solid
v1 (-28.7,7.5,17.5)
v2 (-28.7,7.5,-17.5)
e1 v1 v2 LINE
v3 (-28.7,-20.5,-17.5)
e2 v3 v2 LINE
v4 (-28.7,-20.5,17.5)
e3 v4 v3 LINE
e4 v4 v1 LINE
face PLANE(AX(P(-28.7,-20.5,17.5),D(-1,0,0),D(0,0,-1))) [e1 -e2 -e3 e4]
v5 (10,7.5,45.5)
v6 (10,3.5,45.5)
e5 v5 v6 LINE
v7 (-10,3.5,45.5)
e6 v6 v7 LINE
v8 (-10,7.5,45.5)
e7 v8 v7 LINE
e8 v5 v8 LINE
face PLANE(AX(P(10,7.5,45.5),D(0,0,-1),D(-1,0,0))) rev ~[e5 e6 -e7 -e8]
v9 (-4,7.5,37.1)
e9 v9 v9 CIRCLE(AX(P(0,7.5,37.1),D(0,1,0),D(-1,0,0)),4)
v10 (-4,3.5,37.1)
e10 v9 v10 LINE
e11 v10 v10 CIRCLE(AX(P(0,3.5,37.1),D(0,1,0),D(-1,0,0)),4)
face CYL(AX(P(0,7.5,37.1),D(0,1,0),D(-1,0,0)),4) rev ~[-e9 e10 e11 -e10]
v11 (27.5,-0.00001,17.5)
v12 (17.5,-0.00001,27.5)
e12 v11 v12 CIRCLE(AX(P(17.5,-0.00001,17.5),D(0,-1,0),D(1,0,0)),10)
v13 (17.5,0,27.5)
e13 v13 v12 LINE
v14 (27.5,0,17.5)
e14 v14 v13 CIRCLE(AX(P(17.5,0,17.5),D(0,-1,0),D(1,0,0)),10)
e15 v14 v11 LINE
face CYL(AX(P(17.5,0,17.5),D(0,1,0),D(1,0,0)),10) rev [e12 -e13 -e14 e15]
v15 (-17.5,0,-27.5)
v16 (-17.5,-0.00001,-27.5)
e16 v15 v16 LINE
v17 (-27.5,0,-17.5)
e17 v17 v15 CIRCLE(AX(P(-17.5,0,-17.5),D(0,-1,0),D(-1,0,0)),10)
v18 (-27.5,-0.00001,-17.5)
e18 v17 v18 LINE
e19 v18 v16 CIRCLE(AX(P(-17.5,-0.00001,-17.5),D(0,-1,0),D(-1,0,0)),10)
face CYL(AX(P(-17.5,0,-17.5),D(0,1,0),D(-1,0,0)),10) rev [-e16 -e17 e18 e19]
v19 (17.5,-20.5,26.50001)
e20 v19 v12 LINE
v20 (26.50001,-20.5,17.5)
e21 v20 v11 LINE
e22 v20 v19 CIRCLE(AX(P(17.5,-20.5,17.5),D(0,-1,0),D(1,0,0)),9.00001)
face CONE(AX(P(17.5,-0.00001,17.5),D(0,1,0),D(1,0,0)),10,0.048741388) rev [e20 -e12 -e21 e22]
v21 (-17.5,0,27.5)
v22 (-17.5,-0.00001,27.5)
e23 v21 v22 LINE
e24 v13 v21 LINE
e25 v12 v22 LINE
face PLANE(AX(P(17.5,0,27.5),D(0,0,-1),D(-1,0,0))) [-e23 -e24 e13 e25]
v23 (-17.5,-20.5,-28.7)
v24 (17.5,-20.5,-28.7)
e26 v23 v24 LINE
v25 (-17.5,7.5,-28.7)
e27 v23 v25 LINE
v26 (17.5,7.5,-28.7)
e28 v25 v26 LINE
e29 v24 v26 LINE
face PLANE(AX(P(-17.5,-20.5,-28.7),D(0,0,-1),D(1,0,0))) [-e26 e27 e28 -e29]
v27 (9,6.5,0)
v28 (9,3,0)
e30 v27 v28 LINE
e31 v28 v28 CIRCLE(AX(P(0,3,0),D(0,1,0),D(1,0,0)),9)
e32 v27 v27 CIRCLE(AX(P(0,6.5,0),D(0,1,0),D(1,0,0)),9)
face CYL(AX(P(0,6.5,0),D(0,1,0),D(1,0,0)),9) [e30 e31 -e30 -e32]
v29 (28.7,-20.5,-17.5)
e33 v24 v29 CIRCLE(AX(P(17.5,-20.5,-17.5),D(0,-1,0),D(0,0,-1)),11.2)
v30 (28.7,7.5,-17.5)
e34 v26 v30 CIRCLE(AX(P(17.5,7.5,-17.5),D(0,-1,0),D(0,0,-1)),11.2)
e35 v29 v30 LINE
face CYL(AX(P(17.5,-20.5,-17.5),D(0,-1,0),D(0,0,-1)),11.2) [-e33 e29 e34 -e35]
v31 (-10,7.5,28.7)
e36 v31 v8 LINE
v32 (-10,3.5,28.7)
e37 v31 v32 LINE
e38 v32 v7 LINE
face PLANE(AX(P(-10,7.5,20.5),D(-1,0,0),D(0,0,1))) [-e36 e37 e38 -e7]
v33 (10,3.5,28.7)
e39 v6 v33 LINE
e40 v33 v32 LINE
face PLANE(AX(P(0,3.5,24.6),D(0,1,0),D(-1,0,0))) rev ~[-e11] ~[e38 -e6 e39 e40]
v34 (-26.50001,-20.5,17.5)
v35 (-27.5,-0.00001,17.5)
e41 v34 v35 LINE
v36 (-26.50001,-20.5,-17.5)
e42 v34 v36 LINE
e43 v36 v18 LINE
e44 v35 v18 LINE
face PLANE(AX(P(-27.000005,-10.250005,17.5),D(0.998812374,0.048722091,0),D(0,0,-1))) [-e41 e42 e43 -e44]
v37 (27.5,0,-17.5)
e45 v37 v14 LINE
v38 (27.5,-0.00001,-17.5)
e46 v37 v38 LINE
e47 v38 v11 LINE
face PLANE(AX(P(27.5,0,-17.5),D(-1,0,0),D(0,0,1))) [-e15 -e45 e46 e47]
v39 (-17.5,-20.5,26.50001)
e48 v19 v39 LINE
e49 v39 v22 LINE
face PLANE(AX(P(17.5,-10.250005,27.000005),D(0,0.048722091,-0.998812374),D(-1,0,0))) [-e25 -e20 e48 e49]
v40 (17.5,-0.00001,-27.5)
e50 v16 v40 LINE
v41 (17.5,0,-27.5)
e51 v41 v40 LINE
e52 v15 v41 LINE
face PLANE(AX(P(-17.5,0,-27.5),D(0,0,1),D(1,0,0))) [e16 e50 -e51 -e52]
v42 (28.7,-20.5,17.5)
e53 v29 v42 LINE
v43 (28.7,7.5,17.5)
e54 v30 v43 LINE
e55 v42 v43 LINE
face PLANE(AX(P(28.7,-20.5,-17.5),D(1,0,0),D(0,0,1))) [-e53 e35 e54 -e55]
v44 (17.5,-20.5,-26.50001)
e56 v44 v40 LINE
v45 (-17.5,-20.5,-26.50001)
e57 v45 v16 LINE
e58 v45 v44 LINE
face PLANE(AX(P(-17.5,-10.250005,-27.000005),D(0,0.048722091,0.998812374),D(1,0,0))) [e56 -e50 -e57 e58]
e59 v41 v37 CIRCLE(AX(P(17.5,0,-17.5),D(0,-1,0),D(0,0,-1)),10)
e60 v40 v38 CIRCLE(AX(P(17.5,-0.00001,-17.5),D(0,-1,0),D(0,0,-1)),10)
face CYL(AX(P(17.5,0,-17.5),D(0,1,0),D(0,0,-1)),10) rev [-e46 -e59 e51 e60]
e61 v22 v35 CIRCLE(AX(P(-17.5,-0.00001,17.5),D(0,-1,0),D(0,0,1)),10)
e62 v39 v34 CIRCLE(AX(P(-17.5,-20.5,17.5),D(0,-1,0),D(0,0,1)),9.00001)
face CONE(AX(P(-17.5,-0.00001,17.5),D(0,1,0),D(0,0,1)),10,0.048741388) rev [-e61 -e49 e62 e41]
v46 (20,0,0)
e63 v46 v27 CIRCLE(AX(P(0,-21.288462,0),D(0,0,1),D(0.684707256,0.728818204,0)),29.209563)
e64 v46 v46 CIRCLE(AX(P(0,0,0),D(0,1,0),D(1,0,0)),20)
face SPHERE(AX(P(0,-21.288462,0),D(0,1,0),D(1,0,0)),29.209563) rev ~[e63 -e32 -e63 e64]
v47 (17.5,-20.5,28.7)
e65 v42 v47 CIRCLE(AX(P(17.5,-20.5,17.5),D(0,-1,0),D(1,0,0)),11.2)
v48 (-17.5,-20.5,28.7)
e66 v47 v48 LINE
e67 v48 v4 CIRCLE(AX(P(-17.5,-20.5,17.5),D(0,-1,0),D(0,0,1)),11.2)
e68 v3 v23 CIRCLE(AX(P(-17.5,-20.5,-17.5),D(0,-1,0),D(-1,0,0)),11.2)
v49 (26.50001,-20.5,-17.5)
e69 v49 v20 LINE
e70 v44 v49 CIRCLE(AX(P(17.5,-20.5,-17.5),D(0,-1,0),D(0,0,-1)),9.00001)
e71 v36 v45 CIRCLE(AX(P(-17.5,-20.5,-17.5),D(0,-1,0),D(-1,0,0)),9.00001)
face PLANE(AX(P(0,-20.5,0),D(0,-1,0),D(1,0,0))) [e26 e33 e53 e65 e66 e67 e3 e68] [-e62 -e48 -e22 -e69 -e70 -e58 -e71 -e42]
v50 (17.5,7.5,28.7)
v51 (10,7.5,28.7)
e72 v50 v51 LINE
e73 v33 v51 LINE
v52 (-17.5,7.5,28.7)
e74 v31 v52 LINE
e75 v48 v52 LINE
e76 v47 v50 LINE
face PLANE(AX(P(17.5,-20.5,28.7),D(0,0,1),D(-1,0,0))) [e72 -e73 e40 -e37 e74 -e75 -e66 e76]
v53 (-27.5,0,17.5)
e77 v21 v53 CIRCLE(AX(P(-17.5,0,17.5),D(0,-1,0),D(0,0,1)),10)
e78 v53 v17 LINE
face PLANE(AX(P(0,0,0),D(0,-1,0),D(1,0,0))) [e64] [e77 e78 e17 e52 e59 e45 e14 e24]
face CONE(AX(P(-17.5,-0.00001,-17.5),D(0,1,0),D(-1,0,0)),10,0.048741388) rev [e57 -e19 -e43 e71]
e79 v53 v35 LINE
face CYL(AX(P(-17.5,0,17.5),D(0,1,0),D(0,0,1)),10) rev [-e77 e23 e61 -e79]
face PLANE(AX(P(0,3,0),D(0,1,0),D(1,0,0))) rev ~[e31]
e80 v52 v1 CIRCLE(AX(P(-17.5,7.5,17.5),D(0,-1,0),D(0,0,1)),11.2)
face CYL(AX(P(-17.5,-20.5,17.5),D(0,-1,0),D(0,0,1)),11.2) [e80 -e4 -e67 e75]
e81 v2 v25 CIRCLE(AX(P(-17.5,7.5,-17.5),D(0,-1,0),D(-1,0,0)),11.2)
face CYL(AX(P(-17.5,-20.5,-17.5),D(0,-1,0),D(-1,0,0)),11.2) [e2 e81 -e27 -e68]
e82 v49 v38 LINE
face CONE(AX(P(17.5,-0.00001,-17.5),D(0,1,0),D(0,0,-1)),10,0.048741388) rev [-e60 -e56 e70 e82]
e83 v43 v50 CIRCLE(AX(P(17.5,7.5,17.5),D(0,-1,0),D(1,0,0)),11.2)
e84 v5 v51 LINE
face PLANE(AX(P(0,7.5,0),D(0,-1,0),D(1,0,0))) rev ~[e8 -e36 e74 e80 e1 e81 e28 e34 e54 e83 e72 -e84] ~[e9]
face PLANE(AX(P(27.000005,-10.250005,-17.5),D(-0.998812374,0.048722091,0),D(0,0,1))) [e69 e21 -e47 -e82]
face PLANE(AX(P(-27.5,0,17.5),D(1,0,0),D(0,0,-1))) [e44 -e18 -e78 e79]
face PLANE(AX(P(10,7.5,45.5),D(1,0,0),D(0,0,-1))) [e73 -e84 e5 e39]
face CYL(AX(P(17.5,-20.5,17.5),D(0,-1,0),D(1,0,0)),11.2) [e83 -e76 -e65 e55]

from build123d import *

# Parameters (mm, degrees)
F0_R      = 20
F0_R_2    = 9
F2_DEPTH  = 20.5
F3_SIZE2  = 20.49999
F3_SIZE   = 0.99999
F5_DEPTH  = 3.5
F7_DEPTH  = 28
F9_W      = 20
F9_H      = 8.2
F9_H_2    = 16.8
F9_R      = 4
F10_DEPTH = 4


# Not quite as in the source:
# - a fillet or chamfer is up to 0.001 mm smaller than in the source, because OpenCascade refuses the exact size
# - a feature names something its author has since deleted; it is built from what else it names


with BuildPart() as f2:
    # F0 (on Front) → F2 (new body)
    with BuildSketch(Plane.XZ):
        with BuildLine():
            Line((-17.5, -27.5), (17.5, -27.5))
            ThreePointArc((17.5, -27.5), (24.5710678119, -24.5710678119), (27.5, -17.5))
            Line((27.5, -17.5), (27.5, 17.5))
            ThreePointArc((27.5, 17.5), (24.5710678119, 24.5710678119), (17.5, 27.5))
            Line((17.5, 27.5), (-17.5, 27.5))
            ThreePointArc((-17.5, 27.5), (-24.5710678119, 24.5710678119), (-27.5, 17.5))
            Line((-27.5, 17.5), (-27.5, -17.5))
            ThreePointArc((-27.5, -17.5), (-24.5710678119, -24.5710678119), (-17.5, -27.5))
        make_face()
        with BuildLine():
            ThreePointArc((17.5, 26.5), (23.8639610307, 23.8639610307), (26.5, 17.5))
            Line((26.5, 17.5), (26.5, -17.5))
            ThreePointArc((26.5, -17.5), (23.8639610307, -23.8639610307), (17.5, -26.5))
            Line((17.5, -26.5), (-17.5, -26.5))
            ThreePointArc((-17.5, -26.5), (-23.8639610307, -23.8639610307), (-26.5, -17.5))
            Line((-26.5, -17.5), (-26.5, 17.5))
            ThreePointArc((-26.5, 17.5), (-23.8639610307, 23.8639610307), (-17.5, 26.5))
            Line((-17.5, 26.5), (17.5, 26.5))
        make_face(mode=Mode.SUBTRACT)
        with BuildLine():
            Line((26.5, -17.5), (26.5, 17.5))
            ThreePointArc((26.5, 17.5), (23.8639610307, 23.8639610307), (17.5, 26.5))
            Line((17.5, 26.5), (-17.5, 26.5))
            ThreePointArc((-17.5, 26.5), (-23.8639610307, 23.8639610307), (-26.5, 17.5))
            Line((-26.5, 17.5), (-26.5, -17.5))
            ThreePointArc((-26.5, -17.5), (-23.8639610307, -23.8639610307), (-17.5, -26.5))
            Line((-17.5, -26.5), (17.5, -26.5))
            ThreePointArc((17.5, -26.5), (23.8639610307, -23.8639610307), (26.5, -17.5))
        make_face()
        with BuildLine():
            ThreePointArc((17.5, 25.5), (23.1568542495, 23.1568542495), (25.5, 17.5))
            Line((25.5, 17.5), (25.5, -17.5))
            ThreePointArc((25.5, -17.5), (23.1568542495, -23.1568542495), (17.5, -25.5))
            Line((17.5, -25.5), (-17.5, -25.5))
            ThreePointArc((-17.5, -25.5), (-23.1568542495, -23.1568542495), (-25.5, -17.5))
            Line((-25.5, -17.5), (-25.5, 17.5))
            ThreePointArc((-25.5, 17.5), (-23.1568542495, 23.1568542495), (-17.5, 25.5))
            Line((-17.5, 25.5), (17.5, 25.5))
        make_face(mode=Mode.SUBTRACT)
        with BuildLine():
            Line((25.5, -17.5), (25.5, 17.5))
            ThreePointArc((25.5, 17.5), (23.1568542495, 23.1568542495), (17.5, 25.5))
            Line((17.5, 25.5), (-17.5, 25.5))
            ThreePointArc((-17.5, 25.5), (-23.1568542495, 23.1568542495), (-25.5, 17.5))
            Line((-25.5, 17.5), (-25.5, -17.5))
            ThreePointArc((-25.5, -17.5), (-23.1568542495, -23.1568542495), (-17.5, -25.5))
            Line((-17.5, -25.5), (17.5, -25.5))
            ThreePointArc((17.5, -25.5), (23.1568542495, -23.1568542495), (25.5, -17.5))
        make_face()
        Circle(F0_R, mode=Mode.SUBTRACT)
        Circle(F0_R)
        Circle(F0_R_2, mode=Mode.SUBTRACT)
        Circle(F0_R_2)
    extrude(amount=F2_DEPTH)

    # F3 (size 1 and 20.5 in the source; OpenCascade refuses exactly that, so slightly less here)
    f3_edges = [f2.edges().sort_by_distance(p)[0] for p in [
        (0, -20.5, -27.5),
        (24.571068, -20.5, -24.571068),
        (27.5, -20.5, 0),
        (24.571068, -20.5, 24.571068),
        (0, -20.5, 27.5),
        (-24.571068, -20.5, 24.571068),
        (-27.5, -20.5, 0),
        (-24.571068, -20.5, -24.571068),
    ]]
    f3_side = f2.faces().sort_by_distance((0, -20.5, 0))[0]
    chamfer(f3_edges, length=F3_SIZE, length2=F3_SIZE2, reference=f3_side)

    # F1 (on Top) → F4 (revolve)
    with BuildSketch(Plane.XY):
        with BuildLine():
            Line((9, 0), (20, 0))
            ThreePointArc((20, 0), (14.8597611017, 3.8588264798), (9, 6.5))
            Line((9, 6.5), (0, 6.5))
            Line((0, 6.5), (0, 0))
            Line((0, 0), (9, 0))
        make_face()
    revolve(axis=Axis((0, 3.25, 0), (0, 1, 0)))

    # F5 (cut): a face of the model
    f5_faces = [f2.faces().sort_by_distance(p)[0] for p in [
        (0, 6.5, 0),
    ]]
    extrude(f5_faces, amount=-F5_DEPTH, mode=Mode.SUBTRACT)


with BuildPart() as f7:
    # F6 (on face) → F7 (new body)
    with BuildSketch(Plane.XZ.offset(20.5)):
        with BuildLine():
            Line((-28.7, 17.5), (-28.7, -17.5))
            ThreePointArc((-28.7, -17.5), (-25.4195959493, -25.4195959493), (-17.5, -28.7))
            Line((-17.5, -28.7), (17.5, -28.7))
            ThreePointArc((17.5, -28.7), (25.4195959493, -25.4195959493), (28.7, -17.5))
            Line((28.7, -17.5), (28.7, 17.5))
            ThreePointArc((28.7, 17.5), (25.4195959493, 25.4195959493), (17.5, 28.7))
            Line((17.5, 28.7), (-17.5, 28.7))
            ThreePointArc((-17.5, 28.7), (-25.4195959493, 25.4195959493), (-28.7, 17.5))
        make_face()
        with BuildLine():
            Line((17.5, -26.50001), (-17.5, -26.50001))
            ThreePointArc((-17.5, -26.50001), (-23.8639681017, -23.8639681017), (-26.50001, -17.5))
            Line((-26.50001, -17.5), (-26.50001, 17.5))
            ThreePointArc((-26.50001, 17.5), (-23.8639681017, 23.8639681017), (-17.5, 26.50001))
            Line((-17.5, 26.50001), (17.5, 26.50001))
            ThreePointArc((17.5, 26.50001), (23.8639681017, 23.8639681017), (26.50001, 17.5))
            Line((26.50001, 17.5), (26.50001, -17.5))
            ThreePointArc((26.50001, -17.5), (23.8639681017, -23.8639681017), (17.5, -26.50001))
        make_face(mode=Mode.SUBTRACT)
        with BuildLine():
            ThreePointArc((-26.50001, -17.5), (-23.8639681017, -23.8639681017), (-17.5, -26.50001))
            Line((-17.5, -26.50001), (17.5, -26.50001))
            ThreePointArc((17.5, -26.50001), (23.8639681017, -23.8639681017), (26.50001, -17.5))
            Line((26.50001, -17.5), (26.50001, 17.5))
            ThreePointArc((26.50001, 17.5), (23.8639681017, 23.8639681017), (17.5, 26.50001))
            Line((17.5, 26.50001), (-17.5, 26.50001))
            ThreePointArc((-17.5, 26.50001), (-23.8639681017, 23.8639681017), (-26.50001, 17.5))
            Line((-26.50001, 17.5), (-26.50001, -17.5))
        make_face()
    extrude(amount=-F7_DEPTH)

    # F8: cut F2
    add(f2.part, mode=Mode.SUBTRACT)

    # F9 (on face) → F10 (join)
    with BuildSketch(Plane(origin=(0, 7.5, 0), x_dir=(-1, 0, 0), z_dir=(0, 1, 0))):
        with Locations((0, 24.6)):
            Rectangle(F9_W, F9_H)
        with Locations((0, 37.1)):
            Rectangle(F9_W, F9_H_2)
        with Locations((0, 37.1)):
            Circle(F9_R, mode=Mode.SUBTRACT)
    extrude(amount=-F10_DEPTH)


solid = f7.part
